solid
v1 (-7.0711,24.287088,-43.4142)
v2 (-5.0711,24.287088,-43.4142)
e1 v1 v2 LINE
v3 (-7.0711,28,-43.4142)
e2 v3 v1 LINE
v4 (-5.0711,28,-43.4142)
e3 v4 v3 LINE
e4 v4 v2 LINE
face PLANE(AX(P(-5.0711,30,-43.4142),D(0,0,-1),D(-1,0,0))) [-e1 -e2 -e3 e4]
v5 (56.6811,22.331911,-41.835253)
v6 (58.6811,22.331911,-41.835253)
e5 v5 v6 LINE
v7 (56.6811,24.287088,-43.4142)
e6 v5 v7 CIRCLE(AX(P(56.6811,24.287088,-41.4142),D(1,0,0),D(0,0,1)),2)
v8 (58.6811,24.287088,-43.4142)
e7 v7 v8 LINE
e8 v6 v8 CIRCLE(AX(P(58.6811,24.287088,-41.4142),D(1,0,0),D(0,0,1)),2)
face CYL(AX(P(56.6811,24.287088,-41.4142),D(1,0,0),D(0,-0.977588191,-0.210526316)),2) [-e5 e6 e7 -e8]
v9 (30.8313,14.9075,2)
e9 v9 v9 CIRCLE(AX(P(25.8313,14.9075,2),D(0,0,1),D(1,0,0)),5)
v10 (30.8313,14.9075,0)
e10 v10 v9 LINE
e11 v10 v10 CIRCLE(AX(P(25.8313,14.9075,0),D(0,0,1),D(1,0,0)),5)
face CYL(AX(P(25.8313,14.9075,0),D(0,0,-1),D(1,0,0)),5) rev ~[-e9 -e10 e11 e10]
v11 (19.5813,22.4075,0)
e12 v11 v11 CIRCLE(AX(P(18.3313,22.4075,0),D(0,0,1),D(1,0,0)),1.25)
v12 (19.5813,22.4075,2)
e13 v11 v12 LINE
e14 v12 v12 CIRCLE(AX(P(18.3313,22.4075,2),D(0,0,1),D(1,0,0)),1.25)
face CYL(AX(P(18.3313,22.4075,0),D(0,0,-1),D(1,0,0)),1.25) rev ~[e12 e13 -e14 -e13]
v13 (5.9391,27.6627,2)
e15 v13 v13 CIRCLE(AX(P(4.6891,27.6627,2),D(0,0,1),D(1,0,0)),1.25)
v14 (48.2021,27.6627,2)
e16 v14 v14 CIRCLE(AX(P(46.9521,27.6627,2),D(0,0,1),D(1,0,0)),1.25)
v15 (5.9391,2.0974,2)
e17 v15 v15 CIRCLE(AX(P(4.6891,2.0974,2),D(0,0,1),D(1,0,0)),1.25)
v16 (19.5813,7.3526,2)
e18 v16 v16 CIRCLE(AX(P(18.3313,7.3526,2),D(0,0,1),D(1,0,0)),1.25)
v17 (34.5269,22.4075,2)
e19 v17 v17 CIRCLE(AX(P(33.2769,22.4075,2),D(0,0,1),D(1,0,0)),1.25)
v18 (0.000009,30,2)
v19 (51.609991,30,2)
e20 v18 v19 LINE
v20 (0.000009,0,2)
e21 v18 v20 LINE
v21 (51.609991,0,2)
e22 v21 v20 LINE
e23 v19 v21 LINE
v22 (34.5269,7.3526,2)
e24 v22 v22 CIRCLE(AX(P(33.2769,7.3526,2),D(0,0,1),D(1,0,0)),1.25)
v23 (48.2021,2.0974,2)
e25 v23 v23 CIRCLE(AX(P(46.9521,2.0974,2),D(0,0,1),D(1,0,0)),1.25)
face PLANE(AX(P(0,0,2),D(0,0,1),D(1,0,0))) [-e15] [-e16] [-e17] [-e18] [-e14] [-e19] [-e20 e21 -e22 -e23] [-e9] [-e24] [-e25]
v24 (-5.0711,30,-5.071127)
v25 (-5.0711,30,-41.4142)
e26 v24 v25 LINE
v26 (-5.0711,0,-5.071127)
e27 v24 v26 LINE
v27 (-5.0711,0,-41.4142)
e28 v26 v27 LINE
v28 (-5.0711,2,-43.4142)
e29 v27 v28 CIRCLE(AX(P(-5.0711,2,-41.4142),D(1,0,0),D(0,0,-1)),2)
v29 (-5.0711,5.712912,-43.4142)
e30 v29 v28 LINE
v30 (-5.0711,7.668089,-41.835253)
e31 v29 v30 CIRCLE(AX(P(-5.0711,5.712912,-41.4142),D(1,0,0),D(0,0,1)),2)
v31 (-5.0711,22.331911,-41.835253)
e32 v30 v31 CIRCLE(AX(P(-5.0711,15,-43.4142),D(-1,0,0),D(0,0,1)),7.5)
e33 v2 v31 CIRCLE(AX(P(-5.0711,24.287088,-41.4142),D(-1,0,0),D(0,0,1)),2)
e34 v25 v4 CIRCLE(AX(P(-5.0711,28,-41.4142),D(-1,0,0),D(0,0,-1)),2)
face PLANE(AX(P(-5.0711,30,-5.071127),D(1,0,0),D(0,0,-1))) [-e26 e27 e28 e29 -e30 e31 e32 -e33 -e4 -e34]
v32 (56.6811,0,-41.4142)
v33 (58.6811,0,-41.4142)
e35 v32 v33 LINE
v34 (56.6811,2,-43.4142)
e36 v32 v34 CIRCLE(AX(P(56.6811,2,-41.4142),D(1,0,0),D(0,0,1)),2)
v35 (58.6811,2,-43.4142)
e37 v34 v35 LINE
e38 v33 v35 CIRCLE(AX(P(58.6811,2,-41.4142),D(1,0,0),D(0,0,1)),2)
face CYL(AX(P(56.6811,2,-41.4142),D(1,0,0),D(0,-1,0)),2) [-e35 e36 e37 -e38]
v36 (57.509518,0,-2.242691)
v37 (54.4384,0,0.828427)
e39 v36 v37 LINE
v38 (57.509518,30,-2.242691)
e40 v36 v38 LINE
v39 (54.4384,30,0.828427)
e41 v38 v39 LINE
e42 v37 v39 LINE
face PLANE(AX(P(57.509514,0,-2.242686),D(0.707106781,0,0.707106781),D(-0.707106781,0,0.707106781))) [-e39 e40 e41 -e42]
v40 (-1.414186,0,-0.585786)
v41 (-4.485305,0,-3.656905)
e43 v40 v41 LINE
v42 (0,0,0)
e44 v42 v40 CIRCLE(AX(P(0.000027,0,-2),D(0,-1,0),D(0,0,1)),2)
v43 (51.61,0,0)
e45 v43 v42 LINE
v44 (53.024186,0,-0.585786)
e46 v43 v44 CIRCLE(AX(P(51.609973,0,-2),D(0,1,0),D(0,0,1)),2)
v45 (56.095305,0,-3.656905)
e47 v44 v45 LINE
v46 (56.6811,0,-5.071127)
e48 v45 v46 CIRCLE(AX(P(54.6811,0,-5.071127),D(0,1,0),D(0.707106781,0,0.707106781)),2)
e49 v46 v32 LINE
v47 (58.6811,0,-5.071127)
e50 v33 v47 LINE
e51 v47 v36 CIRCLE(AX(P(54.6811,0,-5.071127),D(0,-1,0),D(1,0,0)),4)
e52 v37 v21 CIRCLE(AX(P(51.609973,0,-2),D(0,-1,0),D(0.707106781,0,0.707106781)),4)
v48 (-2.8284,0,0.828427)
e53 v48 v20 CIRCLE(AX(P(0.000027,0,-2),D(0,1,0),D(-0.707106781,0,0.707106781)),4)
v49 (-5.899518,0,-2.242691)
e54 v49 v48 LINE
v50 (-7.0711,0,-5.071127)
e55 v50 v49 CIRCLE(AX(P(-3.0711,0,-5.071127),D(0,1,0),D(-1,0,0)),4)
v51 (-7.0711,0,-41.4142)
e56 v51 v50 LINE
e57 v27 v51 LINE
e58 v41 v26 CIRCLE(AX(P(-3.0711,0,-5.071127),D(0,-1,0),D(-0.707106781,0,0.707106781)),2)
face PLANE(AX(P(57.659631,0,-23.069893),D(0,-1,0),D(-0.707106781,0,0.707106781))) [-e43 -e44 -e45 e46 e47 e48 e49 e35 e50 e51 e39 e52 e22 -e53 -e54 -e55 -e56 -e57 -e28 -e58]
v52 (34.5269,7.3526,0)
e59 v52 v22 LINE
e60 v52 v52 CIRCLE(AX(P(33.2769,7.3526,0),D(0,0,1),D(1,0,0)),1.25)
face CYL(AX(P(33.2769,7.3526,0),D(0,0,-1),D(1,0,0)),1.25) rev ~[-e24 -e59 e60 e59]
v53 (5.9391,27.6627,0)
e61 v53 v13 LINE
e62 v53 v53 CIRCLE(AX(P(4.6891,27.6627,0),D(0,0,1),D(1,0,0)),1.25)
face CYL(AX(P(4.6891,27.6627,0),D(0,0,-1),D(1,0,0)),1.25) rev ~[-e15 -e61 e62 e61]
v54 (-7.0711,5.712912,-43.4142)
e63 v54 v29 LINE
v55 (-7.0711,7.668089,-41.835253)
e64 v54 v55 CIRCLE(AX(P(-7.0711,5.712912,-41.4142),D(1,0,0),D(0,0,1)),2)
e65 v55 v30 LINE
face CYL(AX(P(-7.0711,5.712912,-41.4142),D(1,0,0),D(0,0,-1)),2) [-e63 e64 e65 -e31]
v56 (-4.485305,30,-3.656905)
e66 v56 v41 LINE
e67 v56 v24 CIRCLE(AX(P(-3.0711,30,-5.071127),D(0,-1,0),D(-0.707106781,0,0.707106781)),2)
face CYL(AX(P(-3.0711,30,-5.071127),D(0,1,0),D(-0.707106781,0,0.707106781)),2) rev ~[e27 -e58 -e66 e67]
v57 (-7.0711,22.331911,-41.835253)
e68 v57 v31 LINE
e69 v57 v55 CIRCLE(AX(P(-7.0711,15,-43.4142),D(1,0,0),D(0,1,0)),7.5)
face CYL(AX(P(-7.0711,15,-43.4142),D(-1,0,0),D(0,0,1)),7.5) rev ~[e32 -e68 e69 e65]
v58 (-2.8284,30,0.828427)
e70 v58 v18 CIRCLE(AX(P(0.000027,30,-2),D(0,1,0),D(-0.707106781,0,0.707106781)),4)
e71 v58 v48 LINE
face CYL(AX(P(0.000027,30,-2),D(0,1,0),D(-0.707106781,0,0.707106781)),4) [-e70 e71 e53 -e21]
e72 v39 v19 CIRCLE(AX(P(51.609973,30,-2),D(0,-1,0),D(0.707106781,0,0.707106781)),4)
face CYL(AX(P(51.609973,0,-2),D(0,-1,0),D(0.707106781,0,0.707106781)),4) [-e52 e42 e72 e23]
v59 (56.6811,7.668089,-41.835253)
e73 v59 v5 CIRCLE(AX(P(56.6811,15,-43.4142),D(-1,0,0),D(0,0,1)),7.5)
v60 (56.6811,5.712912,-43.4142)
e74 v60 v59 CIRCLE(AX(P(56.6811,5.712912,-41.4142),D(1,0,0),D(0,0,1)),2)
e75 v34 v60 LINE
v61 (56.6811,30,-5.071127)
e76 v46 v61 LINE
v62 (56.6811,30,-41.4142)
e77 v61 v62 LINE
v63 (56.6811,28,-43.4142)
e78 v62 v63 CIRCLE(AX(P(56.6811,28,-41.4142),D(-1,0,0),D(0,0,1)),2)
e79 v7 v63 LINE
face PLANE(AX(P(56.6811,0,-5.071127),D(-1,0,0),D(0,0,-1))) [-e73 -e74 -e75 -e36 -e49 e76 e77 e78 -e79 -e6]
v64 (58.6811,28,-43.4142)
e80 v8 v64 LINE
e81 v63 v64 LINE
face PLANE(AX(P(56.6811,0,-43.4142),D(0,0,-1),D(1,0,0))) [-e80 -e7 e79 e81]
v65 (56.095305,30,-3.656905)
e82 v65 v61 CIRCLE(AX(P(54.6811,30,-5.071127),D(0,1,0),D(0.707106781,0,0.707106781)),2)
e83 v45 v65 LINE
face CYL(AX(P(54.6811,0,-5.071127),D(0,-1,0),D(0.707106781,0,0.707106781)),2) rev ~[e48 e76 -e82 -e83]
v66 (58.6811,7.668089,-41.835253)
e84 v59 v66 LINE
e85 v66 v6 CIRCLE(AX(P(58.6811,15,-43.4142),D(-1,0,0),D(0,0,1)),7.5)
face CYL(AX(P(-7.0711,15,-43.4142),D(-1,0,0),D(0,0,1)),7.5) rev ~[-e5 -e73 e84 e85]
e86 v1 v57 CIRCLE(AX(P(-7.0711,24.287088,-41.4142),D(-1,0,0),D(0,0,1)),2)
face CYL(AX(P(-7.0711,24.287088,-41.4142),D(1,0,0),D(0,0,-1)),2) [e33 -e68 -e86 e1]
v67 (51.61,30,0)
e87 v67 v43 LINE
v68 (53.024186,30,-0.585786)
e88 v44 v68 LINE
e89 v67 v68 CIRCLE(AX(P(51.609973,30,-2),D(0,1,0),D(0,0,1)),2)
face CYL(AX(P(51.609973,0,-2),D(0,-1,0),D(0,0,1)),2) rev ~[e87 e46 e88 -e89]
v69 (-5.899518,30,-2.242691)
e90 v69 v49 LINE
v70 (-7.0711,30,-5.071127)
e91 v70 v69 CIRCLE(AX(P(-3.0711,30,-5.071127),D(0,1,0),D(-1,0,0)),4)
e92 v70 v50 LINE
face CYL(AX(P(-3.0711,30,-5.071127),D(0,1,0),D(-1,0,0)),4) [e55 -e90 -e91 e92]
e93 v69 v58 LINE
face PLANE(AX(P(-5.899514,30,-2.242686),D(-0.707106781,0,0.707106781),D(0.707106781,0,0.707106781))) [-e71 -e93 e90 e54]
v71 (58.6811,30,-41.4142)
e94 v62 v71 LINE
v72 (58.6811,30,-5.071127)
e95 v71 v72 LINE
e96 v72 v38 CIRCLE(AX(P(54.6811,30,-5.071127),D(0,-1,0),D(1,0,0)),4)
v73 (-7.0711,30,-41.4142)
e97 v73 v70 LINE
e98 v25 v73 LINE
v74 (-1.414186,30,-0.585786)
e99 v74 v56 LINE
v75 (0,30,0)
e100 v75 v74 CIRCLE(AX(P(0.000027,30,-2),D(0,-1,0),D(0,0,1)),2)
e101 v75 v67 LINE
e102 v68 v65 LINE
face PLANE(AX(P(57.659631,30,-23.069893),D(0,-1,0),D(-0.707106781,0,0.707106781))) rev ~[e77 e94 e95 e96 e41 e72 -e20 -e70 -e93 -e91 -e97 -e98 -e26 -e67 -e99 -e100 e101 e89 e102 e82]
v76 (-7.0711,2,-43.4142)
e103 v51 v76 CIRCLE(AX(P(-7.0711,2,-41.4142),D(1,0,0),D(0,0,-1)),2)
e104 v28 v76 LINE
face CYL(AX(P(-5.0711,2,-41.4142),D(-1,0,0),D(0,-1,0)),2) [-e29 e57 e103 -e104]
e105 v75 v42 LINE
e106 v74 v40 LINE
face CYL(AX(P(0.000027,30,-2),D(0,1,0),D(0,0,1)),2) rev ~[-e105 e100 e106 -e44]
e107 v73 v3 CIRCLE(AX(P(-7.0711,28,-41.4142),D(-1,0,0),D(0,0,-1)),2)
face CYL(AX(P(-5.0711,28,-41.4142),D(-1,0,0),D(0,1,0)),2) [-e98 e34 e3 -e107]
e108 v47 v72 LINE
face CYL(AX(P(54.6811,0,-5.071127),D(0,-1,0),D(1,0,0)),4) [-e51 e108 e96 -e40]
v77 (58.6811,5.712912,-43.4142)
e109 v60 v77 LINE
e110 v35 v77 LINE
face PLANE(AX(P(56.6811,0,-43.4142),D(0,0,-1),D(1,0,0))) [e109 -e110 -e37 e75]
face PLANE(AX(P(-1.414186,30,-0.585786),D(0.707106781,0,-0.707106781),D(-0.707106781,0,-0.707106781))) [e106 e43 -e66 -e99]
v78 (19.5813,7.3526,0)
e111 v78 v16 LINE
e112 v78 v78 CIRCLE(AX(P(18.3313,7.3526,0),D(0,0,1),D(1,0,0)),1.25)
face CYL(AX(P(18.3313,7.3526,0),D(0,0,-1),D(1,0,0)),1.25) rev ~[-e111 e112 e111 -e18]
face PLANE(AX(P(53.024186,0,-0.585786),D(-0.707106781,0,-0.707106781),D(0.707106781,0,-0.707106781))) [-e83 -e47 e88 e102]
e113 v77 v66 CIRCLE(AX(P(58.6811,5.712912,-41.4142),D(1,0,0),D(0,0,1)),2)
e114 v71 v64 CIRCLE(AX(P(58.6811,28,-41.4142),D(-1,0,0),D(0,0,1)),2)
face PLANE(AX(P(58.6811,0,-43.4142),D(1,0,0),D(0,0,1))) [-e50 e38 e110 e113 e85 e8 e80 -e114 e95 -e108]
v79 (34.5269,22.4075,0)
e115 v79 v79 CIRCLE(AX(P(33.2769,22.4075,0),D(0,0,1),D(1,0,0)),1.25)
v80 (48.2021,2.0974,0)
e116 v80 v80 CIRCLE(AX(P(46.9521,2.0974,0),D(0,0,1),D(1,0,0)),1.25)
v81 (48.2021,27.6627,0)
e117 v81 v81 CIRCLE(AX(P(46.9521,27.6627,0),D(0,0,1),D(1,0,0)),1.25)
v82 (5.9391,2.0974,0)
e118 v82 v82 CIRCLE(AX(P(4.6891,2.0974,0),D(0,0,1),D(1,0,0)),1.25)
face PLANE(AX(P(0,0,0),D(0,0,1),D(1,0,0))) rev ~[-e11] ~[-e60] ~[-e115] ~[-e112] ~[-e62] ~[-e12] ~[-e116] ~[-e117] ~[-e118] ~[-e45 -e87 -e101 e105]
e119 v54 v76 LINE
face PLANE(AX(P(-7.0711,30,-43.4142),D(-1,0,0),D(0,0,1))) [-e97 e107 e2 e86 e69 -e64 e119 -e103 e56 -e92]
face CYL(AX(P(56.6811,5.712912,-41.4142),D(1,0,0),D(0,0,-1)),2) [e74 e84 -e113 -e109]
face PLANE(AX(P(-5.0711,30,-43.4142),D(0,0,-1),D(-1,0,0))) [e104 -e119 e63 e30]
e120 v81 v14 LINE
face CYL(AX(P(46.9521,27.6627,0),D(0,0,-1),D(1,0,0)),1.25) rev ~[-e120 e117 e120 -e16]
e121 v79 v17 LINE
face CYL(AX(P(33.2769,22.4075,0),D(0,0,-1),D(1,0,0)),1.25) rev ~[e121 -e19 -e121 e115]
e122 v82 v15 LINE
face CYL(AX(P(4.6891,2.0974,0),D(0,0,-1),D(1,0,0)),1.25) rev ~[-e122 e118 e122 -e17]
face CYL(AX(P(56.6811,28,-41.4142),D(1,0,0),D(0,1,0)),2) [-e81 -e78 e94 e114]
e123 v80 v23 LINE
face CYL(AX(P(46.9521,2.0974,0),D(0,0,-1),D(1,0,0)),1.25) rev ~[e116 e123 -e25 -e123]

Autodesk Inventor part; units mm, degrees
ref_plane "YZ Plane" through (0, 0, 0) normal (1, 0, 0) x (0, 1, 0)
ref_plane "XZ Plane" through (0, 0, 0) normal (0, 1, 0) x (-1, 0, 0)
ref_plane "XY Plane" through (0, 0, 0) normal (0, 0, 1) x (1, 0, 0)
sketch "스케치1" plane through (0, 0, 0) normal (0, 0, 1) x (1, 0, 0)
  circle A0 centre (25.8313, 14.9075) radius 5
  circle A1 centre (18.3313, 22.4075) radius 1.25
  circle A2 centre (18.3313, 7.3526) radius 1.25
  circle A3 centre (33.2769, 22.4075) radius 1.25
  circle A4 centre (46.9521, 27.6627) radius 1.25
  circle A5 centre (46.9521, 2.0974) radius 1.25
  circle A6 centre (33.2769, 7.3526) radius 1.25
  line L0 (25.8041, 29.8443) -> (25.8875, 29.8036)
  line L1 (0, 30) -> (0, 0)
  line L2 (0, 30) -> (51.61, 30)
  line L3 (51.61, 30) -> (51.61, 0)
  line L4 (51.61, 0) -> (0, 0)
  line L5 (0, 0) -> (0, 30)
  circle A7 centre (4.6891, 27.6627) radius 1.25
  circle A8 centre (4.6891, 2.0974) radius 1.25
  dimension "d2" = 10
  dimension "d5" = 2.5
  dimension "d26" = 51.61
extrude "판3" add sketch "스케치1" along normal blind 2
sketch "스케치3" plane through (53.0242, 0, -0.5858) normal (0.7071068, 0, 0.7071068) x (0, 1, 0)
  line L0 (30, 0) -> (0, 0)
  line L1 (0, 0) -> (0, -4.3431)
  line L2 (0, -4.3431) -> (30, -4.3431)
  line L3 (30, -4.3431) -> (30, 0)
edge flange "플랜지2" height 6 angle 45 thickness 2 bend radius 2 thickness toward (0.7071068, 0, 0.7071068) relief tear relief width 2 relief depth 1 corner gap 2 corner form 0 edges at (51.61, 15, 0) (0, 15, 0) wall of the first edge with corners at (53.0242, 30, -0.5858) (53.0242, 0, -0.5858) (56.0953, 0, -3.6569) (56.0953, 30, -3.6569)
bend "절곡부2"
corner "구석2"
sketch "스케치4" plane through (56.6811, 0, -5.0711) normal (1, 0, 0) x (0, 1, 0)
  line L0 (30, 0) -> (0, 0)
  line L1 (0, 0) -> (0, -38.3431)
  line L2 (0, -38.3431) -> (30, -38.3431)
  line L3 (30, -38.3431) -> (30, 0)
edge flange "플랜지3" height 40 angle 45 thickness 2 bend radius 2 thickness toward (1, 0, 0) relief tear relief width 2 relief depth 1 corner gap 2 corner form 0 edges at (56.0953, 15, -3.6569) (-4.4853, 15, -3.6569) wall of the first edge with corners at (56.6811, 30, -5.0711) (56.6811, 0, -5.0711) (56.6811, 0, -43.4142) (56.6811, 30, -43.4142)
bend "절곡부3"
corner "구석3"
sketch "스케치5" plane through (-7.0711, 0, -43.4142) normal (-1, 0, 0) x (0, 0, 1)
  line L0 (0, 30) -> (0, 0) projected
  circle A0 centre (0, 15) radius 7.5
  circle A1 centre (0, 15) radius 14.969
  line L1 (0, 15) -> (14.969, 15)
  point P0 (43.4142, 0)
  point P1 (0, 7.5)
  point P2 (0, 22.5)
  dimension "d48" = 15
extrude "돌출2" cut sketch "스케치5" against normal blind 66 contours A0 L1 L0 | L1 A0 L0
fillet "모깎기1" radius 2 8 edges at (57.6811, 0, -43.4142) (-6.0711, 0, -43.4142) (-6.0711, 7.5, -43.4142) (-6.0711, 22.5, -43.4142) (-6.0711, 30, -43.4142) (57.6811, 7.5, -43.4142) (57.6811, 22.5, -43.4142) (57.6811, 30, -43.4142)
equation "\"d28\" = BendReliefWidth"
equation "\"d29\" = BendReliefDepth"
equation "\"d30\" = MinimumRemnant"
equation "\"d31\" = TransitionRadius"
equation "\"d34\" = BendRadius"
equation "\"d35\" = CornerReliefSize"
equation "\"d38\" = BendReliefWidth"
equation "\"d39\" = BendReliefDepth"
equation "\"d40\" = MinimumRemnant"
equation "\"d41\" = TransitionRadius"
equation "\"d44\" = BendRadius"
equation "\"d45\" = CornerReliefSize"
equation "\"TransitionRadius\" = BendRadius"
equation "\"BendReliefWidth\" = 2"
equation "\"BendReliefDepth\" = 1"
equation "\"MinimumRemnant\" = 4"
equation "\"BendRadius\" = 2"
equation "\"CornerReliefSize\" = 8"
properties part number "motor_u" material "알루미늄 6061"
